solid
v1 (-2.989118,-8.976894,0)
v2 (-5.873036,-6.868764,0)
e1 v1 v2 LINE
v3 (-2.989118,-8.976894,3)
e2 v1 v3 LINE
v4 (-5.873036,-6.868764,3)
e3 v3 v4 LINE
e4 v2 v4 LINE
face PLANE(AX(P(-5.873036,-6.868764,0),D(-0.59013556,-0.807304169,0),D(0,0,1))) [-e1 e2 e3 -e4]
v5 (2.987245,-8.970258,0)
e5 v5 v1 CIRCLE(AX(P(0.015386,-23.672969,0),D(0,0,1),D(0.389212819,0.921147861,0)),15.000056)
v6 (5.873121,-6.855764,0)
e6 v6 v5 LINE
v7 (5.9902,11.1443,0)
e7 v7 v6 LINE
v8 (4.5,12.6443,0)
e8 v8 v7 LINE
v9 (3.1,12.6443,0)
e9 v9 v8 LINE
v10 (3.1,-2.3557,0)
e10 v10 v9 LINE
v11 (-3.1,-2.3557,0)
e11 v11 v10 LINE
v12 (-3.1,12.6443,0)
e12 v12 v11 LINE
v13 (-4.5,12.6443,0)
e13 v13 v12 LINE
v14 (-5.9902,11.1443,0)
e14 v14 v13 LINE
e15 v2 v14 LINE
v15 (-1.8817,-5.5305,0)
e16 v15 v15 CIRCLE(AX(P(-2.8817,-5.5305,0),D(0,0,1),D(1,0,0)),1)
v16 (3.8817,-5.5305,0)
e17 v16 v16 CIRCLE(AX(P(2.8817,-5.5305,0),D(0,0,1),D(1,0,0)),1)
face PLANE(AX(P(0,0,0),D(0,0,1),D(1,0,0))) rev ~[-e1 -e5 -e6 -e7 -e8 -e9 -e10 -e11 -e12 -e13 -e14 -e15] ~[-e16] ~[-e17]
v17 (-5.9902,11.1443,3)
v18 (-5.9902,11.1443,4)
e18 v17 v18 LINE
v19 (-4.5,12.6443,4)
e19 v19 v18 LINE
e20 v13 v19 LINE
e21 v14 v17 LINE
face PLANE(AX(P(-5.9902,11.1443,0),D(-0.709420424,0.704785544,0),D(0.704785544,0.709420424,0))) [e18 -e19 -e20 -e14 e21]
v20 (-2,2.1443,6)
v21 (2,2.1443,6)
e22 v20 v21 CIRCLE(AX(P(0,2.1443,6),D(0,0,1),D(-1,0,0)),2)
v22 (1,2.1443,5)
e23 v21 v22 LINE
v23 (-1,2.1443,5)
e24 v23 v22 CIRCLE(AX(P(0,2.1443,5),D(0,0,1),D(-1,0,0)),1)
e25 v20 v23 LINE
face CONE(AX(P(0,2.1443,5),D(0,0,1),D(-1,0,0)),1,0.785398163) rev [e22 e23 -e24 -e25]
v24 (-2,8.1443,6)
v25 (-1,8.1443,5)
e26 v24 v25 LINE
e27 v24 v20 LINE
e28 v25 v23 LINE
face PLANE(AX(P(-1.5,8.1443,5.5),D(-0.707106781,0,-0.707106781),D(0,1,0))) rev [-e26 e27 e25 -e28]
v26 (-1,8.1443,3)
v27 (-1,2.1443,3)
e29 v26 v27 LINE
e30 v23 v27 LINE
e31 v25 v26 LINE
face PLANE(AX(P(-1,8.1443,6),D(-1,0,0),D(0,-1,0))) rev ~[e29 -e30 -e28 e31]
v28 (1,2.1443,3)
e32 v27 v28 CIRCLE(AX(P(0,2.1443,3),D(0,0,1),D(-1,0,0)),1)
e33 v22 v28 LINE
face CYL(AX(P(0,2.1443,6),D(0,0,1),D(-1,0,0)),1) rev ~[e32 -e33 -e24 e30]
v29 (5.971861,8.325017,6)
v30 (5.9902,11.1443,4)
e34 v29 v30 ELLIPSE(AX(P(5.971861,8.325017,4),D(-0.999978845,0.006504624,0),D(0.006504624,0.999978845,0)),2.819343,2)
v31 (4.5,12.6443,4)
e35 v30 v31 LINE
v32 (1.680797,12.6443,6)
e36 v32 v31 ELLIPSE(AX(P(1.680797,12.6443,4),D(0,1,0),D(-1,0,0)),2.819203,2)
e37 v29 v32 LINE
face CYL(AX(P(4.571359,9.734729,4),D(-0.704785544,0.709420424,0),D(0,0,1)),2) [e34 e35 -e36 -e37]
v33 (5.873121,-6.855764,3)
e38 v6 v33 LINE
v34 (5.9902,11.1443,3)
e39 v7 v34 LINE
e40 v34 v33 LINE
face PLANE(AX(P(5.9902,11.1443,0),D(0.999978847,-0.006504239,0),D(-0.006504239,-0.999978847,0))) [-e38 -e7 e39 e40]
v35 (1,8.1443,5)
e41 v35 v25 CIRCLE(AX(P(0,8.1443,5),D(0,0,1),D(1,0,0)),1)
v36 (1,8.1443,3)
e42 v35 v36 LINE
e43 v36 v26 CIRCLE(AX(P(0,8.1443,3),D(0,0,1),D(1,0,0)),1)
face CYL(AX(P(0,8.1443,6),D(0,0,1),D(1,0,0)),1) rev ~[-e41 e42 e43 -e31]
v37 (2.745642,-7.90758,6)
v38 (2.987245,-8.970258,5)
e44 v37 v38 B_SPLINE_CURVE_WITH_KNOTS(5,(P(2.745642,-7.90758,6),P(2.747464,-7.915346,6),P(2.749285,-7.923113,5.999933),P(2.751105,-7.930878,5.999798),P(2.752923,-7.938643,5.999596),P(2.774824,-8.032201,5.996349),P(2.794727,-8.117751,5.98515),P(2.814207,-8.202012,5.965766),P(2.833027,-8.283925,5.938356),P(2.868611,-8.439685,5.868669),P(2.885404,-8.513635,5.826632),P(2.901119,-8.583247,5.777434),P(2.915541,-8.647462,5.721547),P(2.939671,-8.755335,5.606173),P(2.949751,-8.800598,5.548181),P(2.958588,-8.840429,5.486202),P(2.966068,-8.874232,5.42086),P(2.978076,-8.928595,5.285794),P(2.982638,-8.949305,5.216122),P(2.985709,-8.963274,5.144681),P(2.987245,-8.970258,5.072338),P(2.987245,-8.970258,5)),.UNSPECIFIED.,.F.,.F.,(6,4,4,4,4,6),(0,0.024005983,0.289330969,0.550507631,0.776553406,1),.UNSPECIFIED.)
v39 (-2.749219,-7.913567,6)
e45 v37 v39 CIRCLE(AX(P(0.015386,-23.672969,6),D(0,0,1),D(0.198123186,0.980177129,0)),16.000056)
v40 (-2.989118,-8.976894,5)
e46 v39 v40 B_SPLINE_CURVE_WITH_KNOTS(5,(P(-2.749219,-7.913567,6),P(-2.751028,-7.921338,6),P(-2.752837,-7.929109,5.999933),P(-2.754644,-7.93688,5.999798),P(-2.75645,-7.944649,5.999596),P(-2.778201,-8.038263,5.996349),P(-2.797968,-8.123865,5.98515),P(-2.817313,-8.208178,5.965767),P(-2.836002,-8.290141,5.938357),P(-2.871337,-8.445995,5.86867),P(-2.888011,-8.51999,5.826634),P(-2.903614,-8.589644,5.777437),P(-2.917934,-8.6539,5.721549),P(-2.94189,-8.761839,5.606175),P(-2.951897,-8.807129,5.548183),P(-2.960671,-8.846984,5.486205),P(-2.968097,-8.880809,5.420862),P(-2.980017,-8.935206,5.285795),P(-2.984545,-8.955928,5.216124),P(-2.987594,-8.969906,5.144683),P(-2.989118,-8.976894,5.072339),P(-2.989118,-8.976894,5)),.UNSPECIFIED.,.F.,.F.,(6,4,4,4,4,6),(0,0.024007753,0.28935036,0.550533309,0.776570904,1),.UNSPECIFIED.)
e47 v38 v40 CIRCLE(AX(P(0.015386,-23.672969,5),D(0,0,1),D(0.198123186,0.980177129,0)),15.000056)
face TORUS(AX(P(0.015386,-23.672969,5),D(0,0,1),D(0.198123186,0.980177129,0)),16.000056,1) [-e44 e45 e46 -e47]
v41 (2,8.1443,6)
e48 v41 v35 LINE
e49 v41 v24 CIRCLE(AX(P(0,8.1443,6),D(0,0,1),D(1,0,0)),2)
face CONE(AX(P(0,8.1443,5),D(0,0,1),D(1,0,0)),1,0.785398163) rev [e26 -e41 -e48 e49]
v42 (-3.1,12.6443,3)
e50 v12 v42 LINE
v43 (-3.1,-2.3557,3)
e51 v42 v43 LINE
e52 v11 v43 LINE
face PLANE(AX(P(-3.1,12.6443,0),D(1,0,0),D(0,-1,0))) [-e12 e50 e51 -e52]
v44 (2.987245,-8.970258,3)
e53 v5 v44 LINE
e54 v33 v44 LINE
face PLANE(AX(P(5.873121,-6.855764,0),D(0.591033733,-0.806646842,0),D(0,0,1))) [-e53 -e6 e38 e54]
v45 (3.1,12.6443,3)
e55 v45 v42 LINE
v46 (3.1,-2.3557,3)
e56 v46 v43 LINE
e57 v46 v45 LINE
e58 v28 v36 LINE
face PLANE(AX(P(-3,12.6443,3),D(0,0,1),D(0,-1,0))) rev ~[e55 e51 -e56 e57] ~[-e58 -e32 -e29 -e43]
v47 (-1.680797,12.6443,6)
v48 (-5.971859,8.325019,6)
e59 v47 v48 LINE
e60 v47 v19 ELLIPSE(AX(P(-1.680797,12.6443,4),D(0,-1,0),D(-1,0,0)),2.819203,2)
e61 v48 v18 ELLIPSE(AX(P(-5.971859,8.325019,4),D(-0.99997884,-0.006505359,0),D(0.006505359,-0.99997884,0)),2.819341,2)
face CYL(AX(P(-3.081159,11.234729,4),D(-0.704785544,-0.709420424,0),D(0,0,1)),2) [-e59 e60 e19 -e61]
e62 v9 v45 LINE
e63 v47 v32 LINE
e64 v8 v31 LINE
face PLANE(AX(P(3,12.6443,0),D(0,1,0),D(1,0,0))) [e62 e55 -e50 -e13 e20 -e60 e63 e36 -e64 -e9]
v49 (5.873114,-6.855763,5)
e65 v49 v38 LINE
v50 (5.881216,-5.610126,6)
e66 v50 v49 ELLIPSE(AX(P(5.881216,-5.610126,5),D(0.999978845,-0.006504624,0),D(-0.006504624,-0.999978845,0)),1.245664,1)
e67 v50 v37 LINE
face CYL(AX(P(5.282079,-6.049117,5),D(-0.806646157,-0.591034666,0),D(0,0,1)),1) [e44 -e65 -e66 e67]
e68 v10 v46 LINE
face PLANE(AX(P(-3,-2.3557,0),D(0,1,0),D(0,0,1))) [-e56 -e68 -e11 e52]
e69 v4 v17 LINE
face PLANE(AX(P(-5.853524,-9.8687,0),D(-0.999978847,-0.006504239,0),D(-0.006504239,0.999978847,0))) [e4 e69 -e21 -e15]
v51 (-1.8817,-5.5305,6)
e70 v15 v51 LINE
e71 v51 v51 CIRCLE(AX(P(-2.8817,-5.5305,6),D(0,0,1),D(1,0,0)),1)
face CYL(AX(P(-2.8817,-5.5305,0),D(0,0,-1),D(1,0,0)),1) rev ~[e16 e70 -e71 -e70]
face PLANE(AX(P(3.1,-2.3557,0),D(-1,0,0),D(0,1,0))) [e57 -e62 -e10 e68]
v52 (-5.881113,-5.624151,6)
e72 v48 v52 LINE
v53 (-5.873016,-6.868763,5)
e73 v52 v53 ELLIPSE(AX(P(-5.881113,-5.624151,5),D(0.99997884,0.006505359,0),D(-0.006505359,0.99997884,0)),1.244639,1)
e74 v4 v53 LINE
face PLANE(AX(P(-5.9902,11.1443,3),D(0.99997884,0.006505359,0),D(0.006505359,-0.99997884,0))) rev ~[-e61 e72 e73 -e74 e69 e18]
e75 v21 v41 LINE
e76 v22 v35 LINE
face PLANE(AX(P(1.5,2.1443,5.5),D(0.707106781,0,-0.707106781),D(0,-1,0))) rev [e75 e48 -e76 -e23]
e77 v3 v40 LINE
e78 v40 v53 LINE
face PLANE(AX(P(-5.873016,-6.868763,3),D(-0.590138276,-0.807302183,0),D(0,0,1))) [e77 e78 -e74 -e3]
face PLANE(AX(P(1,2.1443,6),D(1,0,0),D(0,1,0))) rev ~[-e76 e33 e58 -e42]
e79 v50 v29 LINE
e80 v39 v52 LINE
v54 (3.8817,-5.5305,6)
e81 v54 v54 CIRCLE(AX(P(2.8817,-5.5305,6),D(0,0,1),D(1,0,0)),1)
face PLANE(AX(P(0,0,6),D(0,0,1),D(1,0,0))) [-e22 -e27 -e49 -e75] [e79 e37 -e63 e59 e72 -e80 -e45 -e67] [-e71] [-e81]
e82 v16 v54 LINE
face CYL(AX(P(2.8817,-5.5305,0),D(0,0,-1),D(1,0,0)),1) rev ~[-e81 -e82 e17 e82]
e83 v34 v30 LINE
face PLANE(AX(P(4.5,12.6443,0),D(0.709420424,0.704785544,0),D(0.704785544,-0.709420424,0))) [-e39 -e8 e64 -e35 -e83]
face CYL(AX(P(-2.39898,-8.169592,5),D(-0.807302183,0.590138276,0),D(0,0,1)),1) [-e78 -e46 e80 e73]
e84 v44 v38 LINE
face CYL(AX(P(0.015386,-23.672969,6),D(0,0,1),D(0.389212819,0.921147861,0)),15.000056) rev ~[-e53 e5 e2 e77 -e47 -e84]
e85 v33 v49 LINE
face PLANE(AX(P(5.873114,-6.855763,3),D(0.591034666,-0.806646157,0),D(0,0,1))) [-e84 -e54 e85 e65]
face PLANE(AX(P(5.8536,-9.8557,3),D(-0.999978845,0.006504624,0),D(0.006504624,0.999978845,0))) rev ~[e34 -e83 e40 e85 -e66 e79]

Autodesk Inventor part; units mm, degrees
ref_plane "YZ Plane" through (0, 0, 0) normal (1, 0, 0) x (0, 1, 0)
ref_plane "XZ Plane" through (0, 0, 0) normal (0, 1, 0) x (-1, 0, 0)
ref_plane "XY Plane" through (0, 0, 0) normal (0, 0, 1) x (1, 0, 0)
sketch "Sketch1" plane through (0, 0, 0) normal (0, 0, 1) x (1, 0, 0)
  circle A0 centre (2.8817, -5.5305) radius 1 projected
  circle A1 centre (-2.8817, -5.5305) radius 1 projected
  line L0 (4.5, 12.6443) -> (5.9902, 11.1443) projected
  line L1 (3, 12.6443) -> (4.5, 12.6443) projected
  line L2 (3, -2.3557) -> (3, 12.6443) projected
  line L3 (-3, -2.3557) -> (3, -2.3557) projected
  line L4 (-3, 12.6443) -> (-3, -2.3557) projected
  line L5 (-4.5, 12.6443) -> (-3, 12.6443) projected
  line L6 (-5.9902, 11.1443) -> (-4.5, 12.6443) projected
  line L7 (-5.8406, -11.8556) -> (-5.9902, 11.1443) projected
  line L8 (-3.8536, -9.8557) -> (-5.8406, -11.8556) projected
  line L9 (-3.8536, -9.8557) -> (3.8536, -9.8557) projected
  line L10 (5.8406, -11.8556) -> (3.8536, -9.8557) projected
  line L11 (5.9902, 11.1443) -> (5.8406, -11.8556) projected
  line L12 (3.8536, -9.8557) -> (5.8536, -9.8557)
  line L13 (-3.8536, -9.8557) -> (-5.8535, -9.8687)
  point P0 (0, 0)
extrude "Extrusion1" add sketch "Sketch1" along normal blind 3 contours L0 L11 L12 L9 L13 L7 L6 L5 L4 L3 L2 L1
sketch "Sketch2" plane through (0, 0, 3) normal (0, 0, 1) x (1, 0, 0)
  line L0 (-3, -2.3557) -> (-3, 12.6443) projected
  line L1 (-3, 12.6443) -> (-4.5, 12.6443) projected
  line L2 (-4.5, 12.6443) -> (-5.9902, 11.1443) projected
  line L3 (-5.9902, 11.1443) -> (-5.8535, -9.8687) projected
  line L4 (-5.8535, -9.8687) -> (-3.8536, -9.8557) projected
  line L5 (-3.8536, -9.8557) -> (5.8536, -9.8557) projected
  line L6 (5.8536, -9.8557) -> (5.9902, 11.1443) projected
  line L7 (5.9902, 11.1443) -> (4.5, 12.6443) projected
  line L8 (4.5, 12.6443) -> (3, 12.6443) projected
  line L9 (3, 12.6443) -> (3, -2.3557) projected
  line L10 (3, -2.3557) -> (-3, -2.3557) projected
  circle A0 centre (-2.8817, -5.5305) radius 1 projected
  circle A1 centre (2.8817, -5.5305) radius 1 projected
  line L11 (3, 12.6443) -> (3, -2.3557) projected
  line L12 (-3, 12.6443) -> (3, 12.6443)
  point P0 (0, 0)
extrude "Extrusion2" add sketch "Sketch2" along normal blind 3
sketch "Sketch3" plane through (0, 0, 6) normal (0, 0, 1) x (1, 0, 0)
  line L0 (-5.8535, -9.8687) -> (-3.8536, -9.8557) projected
  line L1 (-3.8536, -9.8557) -> (5.8536, -9.8557) projected
  line L2 (5.8536, -9.8557) -> (5.9902, 11.1443) projected
  line L3 (5.9902, 11.1443) -> (4.5, 12.6443) projected
  line L4 (4.5, 12.6443) -> (-4.5, 12.6443) projected
  line L5 (-4.5, 12.6443) -> (-5.9902, 11.1443) projected
  line L6 (-5.9902, 11.1443) -> (-5.8535, -9.8687) projected
  circle A0 centre (2.8817, -5.5305) radius 1 projected
  circle A1 centre (-2.8817, -5.5305) radius 1 projected
  line L7 (-5.8535, -9.8687) -> (-3.8536, -9.8557) projected
  arc A2 (5.8536, -9.8557) -> (-5.8535, -9.8687) centre (0.0154, -23.6729) ccw
  point P0 (0, 0)
  dimension "d4" = 15
extrude "Extrusion3" cut sketch "Sketch3" against normal blind 8 contours A2 L1 L0
chamfer "Chamfer1" distance 3 angle 45 2 edges at (5.8536, -9.8557, 3) (-5.8535, -9.8687, 3)
fillet "Fillet1" radius 2 2 edges at (5.2451, 11.8943, 6) (-5.2451, 11.8943, 6)
fillet "Fillet2" radius 1 3 edges at (-4.4311, -7.9228, 6) (-0.0013, -8.6729, 6) (4.4302, -7.913, 6)
sketch "Sketch4" plane through (0, 0, 6) normal (0, 0, 1) x (1, 0, 0)
  line L0 (-1, 8.1443) -> (-1, 2.1443)
  arc A0 (-1, 2.1443) -> (1, 2.1443) centre (0, 2.1443) ccw
  line L1 (1, 2.1443) -> (1, 8.1443)
  arc A1 (1, 8.1443) -> (-1, 8.1443) centre (0, 8.1443) ccw
  line L2 (5.9719, 8.3251) -> (1.6807, 12.6443)
  line L3 (5.9719, 8.3251) -> (5.8537, -9.8477)
  line L4 (3.4979, -11.4182) -> (5.8537, -9.8477)
  spline S0 degree 3 poles (3.7471, -14.0453) (3.5143, -13.7817) (3.313, -13.4738) (3.0785, -12.9028) (3.0205, -12.6553) (3.011, -12.2509) (3.0346, -12.0815) (3.1344, -11.8203) (3.188, -11.725) (3.325, -11.5531) (3.4063, -11.4793) (3.4979, -11.4182) knots 0 0 0 0 0.329568 0.329568 0.580897 0.580897 0.763488 0.763488 0.881593 0.881593 1 1 1 1
  arc A2 (-3.7471, -14.0453) -> (3.7471, -14.0453) centre (0, -17.3557) ccw
  spline S1 degree 3 poles (-3.4979, -11.4182) (-3.3811, -11.4961) (-3.2816, -11.5944) (-3.1273, -11.8263) (-3.0754, -11.9539) (-3.0096, -12.2519) (-3.0068, -12.4209) (-3.0565, -12.825) (-3.1338, -13.0604) (-3.3668, -13.5541) (-3.5446, -13.816) (-3.7471, -14.0453) knots 0 0 0 0 0.142201 0.142201 0.282073 0.282073 0.450832 0.450832 0.692964 0.692964 1 1 1 1
  line L5 (-5.8537, -9.8477) -> (-3.4979, -11.4182)
  line L6 (-5.8537, -9.8477) -> (-5.9719, 8.3251)
  line L7 (-1.6807, 12.6443) -> (-5.9719, 8.3251)
  line L8 (-1.6807, 12.6443) -> (1.6807, 12.6443)
  circle A3 centre (0, -17.3557) radius 1.5
  circle A4 centre (-2.8817, -5.5305) radius 1
  circle A5 centre (2.8817, -5.5305) radius 1
  point P0 (0, 0)
extrude "Extrusion4" cut sketch "Sketch4" against normal blind 8 contours A1 L1 A0 L0
chamfer "Chamfer2" distance 1 angle 45 4 edges at (-1, 5.1443, 6) (0, 9.1443, 6) (1, 5.1443, 6) (0, 1.1443, 6)
thicken "Thicken1" operation add thickness 0.1 both sides no extend neighbours yes toward (-1, 0, 0) faces at (-3, 2.6443, 1)
thicken "Thicken2" operation add thickness 0.1 both sides no extend neighbours yes toward (1, 0, 0) faces at (3, 7.6443, 1)
properties part number "arm_linkage_3"
